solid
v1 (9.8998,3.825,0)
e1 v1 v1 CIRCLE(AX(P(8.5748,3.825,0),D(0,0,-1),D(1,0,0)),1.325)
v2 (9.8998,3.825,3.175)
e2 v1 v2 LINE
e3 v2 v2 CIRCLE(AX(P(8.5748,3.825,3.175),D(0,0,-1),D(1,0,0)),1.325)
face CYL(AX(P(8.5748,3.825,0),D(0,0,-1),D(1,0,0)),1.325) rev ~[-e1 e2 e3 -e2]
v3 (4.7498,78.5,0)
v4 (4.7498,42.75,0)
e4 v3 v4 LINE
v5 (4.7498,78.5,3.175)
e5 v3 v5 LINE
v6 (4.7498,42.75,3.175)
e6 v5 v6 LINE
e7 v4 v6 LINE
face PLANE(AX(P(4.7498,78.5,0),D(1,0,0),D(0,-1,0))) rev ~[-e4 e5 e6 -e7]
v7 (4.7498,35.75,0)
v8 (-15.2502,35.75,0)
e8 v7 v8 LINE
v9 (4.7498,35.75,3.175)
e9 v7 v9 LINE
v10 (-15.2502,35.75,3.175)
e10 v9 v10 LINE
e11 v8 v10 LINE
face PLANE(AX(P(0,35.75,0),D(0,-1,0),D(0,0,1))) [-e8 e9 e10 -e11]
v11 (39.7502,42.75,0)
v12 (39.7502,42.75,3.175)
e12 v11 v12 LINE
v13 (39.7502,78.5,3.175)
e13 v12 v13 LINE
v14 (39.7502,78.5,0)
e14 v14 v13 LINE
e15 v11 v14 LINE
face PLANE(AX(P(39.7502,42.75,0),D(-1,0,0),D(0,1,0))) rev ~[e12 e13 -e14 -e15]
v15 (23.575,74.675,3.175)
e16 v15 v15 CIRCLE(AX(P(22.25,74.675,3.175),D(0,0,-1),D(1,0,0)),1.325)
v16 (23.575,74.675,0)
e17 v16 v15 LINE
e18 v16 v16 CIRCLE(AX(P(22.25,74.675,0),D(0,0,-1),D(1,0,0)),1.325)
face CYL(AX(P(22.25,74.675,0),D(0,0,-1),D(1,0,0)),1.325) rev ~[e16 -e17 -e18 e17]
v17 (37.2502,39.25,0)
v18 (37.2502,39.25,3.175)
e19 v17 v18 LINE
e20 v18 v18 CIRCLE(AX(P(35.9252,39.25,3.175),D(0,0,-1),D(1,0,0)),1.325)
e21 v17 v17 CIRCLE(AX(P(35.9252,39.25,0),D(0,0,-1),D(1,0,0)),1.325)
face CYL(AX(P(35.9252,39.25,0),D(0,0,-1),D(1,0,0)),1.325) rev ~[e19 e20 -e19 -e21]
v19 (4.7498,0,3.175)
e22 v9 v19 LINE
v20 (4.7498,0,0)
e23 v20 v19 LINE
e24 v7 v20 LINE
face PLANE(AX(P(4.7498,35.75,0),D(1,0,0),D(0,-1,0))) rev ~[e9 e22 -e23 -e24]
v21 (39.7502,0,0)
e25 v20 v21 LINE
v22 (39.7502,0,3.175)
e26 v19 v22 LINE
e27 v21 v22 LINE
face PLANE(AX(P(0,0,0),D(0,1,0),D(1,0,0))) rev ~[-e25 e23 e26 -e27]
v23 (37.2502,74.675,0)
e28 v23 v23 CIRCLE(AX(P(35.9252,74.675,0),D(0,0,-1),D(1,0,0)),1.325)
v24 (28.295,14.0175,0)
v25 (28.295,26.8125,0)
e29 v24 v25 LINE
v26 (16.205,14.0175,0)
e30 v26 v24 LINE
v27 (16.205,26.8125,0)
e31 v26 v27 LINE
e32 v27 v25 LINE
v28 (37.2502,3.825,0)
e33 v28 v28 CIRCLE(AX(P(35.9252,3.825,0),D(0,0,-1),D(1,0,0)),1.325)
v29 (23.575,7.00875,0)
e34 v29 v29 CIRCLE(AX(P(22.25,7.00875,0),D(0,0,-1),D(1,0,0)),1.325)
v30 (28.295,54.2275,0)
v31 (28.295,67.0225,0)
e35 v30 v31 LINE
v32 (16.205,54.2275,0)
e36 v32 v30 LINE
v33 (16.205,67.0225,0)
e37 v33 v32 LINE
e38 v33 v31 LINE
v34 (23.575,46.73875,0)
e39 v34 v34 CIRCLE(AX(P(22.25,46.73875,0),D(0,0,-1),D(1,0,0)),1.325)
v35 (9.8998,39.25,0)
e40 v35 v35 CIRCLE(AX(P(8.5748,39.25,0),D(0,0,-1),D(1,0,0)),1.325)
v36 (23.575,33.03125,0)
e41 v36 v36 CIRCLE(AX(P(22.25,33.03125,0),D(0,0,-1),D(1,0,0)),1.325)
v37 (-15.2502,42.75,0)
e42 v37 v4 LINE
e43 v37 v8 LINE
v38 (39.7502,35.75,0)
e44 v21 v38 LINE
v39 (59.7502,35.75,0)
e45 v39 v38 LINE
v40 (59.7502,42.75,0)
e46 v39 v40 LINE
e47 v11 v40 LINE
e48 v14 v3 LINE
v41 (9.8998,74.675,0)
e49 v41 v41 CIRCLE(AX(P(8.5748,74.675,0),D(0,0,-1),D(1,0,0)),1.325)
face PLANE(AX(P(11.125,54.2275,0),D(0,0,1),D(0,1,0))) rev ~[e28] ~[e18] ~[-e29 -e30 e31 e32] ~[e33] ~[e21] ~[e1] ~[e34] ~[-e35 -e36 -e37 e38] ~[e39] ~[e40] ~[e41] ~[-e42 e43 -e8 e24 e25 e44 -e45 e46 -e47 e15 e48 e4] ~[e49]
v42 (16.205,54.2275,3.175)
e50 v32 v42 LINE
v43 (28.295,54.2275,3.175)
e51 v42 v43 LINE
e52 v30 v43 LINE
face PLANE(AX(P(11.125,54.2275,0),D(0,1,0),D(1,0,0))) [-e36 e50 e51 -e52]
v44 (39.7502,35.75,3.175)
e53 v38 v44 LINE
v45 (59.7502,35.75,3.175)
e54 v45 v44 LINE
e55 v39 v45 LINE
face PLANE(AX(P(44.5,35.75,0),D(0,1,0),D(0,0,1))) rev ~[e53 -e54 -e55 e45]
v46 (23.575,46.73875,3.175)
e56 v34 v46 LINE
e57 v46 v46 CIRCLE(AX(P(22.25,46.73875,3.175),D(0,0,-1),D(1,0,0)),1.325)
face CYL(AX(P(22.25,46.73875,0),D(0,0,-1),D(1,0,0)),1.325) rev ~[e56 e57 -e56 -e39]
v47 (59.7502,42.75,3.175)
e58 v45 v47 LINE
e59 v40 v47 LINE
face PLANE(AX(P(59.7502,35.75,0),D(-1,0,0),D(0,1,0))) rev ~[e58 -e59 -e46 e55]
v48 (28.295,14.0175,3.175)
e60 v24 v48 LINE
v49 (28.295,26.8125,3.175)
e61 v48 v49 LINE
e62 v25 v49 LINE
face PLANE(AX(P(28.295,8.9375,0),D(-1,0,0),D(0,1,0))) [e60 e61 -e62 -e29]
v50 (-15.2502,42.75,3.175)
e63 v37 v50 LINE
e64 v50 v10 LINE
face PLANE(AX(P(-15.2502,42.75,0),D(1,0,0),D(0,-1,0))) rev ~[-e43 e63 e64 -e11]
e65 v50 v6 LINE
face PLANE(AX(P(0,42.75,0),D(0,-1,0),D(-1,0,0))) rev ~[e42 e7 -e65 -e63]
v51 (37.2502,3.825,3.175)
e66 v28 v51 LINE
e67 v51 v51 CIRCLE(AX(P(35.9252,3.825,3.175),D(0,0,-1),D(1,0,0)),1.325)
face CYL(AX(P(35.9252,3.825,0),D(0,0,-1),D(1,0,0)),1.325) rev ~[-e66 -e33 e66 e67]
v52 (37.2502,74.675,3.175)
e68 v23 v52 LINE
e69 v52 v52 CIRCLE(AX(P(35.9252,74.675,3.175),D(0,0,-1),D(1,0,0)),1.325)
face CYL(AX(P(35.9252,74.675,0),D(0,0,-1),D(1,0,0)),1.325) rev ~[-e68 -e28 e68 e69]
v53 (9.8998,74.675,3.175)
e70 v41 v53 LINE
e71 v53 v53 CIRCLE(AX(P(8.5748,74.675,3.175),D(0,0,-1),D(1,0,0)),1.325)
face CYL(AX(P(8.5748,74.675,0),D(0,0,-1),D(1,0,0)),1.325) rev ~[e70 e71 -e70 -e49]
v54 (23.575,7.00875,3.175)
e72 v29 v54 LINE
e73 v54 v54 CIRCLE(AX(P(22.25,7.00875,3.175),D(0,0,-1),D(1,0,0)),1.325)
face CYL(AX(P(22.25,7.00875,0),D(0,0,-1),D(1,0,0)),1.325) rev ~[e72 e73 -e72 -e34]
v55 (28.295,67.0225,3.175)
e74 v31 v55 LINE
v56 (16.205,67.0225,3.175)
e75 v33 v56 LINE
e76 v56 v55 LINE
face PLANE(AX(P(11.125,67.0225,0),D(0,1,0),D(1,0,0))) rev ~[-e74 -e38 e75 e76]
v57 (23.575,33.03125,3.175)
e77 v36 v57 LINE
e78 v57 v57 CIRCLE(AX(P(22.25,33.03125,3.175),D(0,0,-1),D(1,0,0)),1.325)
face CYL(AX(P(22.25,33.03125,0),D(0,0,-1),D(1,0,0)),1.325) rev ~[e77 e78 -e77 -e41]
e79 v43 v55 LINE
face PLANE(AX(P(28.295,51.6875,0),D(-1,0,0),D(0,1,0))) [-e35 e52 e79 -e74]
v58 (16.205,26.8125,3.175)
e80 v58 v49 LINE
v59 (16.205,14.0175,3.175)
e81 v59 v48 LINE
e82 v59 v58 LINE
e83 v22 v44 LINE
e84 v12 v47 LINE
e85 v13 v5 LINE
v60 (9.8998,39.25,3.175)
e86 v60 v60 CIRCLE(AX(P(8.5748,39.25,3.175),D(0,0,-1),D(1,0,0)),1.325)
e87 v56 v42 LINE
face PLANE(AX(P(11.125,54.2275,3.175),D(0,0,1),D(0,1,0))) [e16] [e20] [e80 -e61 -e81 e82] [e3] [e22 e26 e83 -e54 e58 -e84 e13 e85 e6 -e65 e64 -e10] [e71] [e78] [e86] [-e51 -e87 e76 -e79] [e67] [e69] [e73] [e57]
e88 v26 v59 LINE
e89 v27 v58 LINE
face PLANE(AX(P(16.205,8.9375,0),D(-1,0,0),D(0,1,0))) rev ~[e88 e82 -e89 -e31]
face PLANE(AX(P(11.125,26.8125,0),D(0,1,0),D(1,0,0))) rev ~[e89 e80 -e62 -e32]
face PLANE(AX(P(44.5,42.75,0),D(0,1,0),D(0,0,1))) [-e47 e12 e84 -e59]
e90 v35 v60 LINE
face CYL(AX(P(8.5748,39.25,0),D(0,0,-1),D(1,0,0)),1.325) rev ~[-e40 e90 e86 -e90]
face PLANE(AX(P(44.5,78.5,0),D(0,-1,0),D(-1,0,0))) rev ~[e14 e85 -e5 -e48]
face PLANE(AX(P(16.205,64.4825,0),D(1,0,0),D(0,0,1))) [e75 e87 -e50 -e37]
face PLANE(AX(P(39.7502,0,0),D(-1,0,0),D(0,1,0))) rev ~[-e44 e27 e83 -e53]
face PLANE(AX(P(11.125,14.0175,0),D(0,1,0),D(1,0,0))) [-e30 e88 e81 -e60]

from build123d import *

# Parameters (mm, degrees)
F0_W      = 22.25
F0_H      = 17.875
F1_DEPTH  = 3.175
F2_DEPTH  = 5.08
F3_DEPTH  = 2.54
F4_DEPTH  = 5.08
F5_DEPTH  = 5.08
F6_DEPTH  = 5.08
F7_DEPTH  = 4.7498
F8_DEPTH  = 4.7498
F9_DEPTH  = 4.7498
F10_DEPTH = 4.7498
F11_DEPTH = 2.54
F12_R     = 1.325
F13_DEPTH = 25.4
F14_DEPTH = 25.4
F15_DEPTH = 25.4
F16_DEPTH = 25.4


# Not quite as in the source:
# - a feature names something its author has since deleted; it is built from what else it names


with BuildPart() as f1:
    # F0 (on Top) → F1 (new body)
    with BuildSketch(Plane.XY):
        Polygon((0, 35.75), (0, 0), (44.5, 0), (44.5, 35.75), (64.5, 35.75), (64.5, 39.25), (64.5, 42.75), (44.5, 42.75), (44.5, 78.5), (0, 78.5), (0, 42.75), (-20, 42.75), (-20, 39.25), (-20, 35.75), align=None)
        with Locations((22.25, 17.875)):
            Rectangle(F0_W, F0_H, mode=Mode.SUBTRACT)
        with Locations((22.25, 60.625)):
            Rectangle(F0_W, F0_H, mode=Mode.SUBTRACT)
    extrude(amount=F1_DEPTH)

    # F2 (add): a face of the model
    f2_faces = [f1.faces().sort_by_distance(p)[0] for p in [
        (22.25, 69.5625, 1.5875),
    ]]
    extrude(f2_faces, amount=F2_DEPTH)

    # F3 (add): faces of the model
    f3_faces = [f1.faces().sort_by_distance(p)[0] for p in [
        (22.25, 51.6875, 1.5875),
        (22.25, 26.8125, 1.5875),
    ]]
    extrude(f3_faces, amount=F3_DEPTH, dir=(0, 1, 0))

    # F4 (add): a face of the model
    f4_faces = [f1.faces().sort_by_distance(p)[0] for p in [
        (22.25, 8.9375, 1.5875),
    ]]
    extrude(f4_faces, amount=F4_DEPTH)

    # F5 (add): faces of the model
    f5_faces = [f1.faces().sort_by_distance(p)[0] for p in [
        (33.375, 59.355, 1.5875),
        (33.375, 20.415, 1.5875),
    ]]
    extrude(f5_faces, amount=F5_DEPTH)

    # F6 (add): faces of the model
    f6_faces = [f1.faces().sort_by_distance(p)[0] for p in [
        (11.125, 59.355, 1.5875),
        (11.125, 20.415, 1.5875),
    ]]
    extrude(f6_faces, amount=F6_DEPTH)

    # F7 (cut): faces of the model
    f7_faces = [f1.faces().sort_by_distance(p)[0] for p in [
        (44.5, 60.625, 1.5875),
        (44.5, 17.875, 1.5875),
    ]]
    extrude(f7_faces, amount=-F7_DEPTH, mode=Mode.SUBTRACT)

    # F8 (cut): faces of the model
    f8_faces = [f1.faces().sort_by_distance(p)[0] for p in [
        (0, 60.625, 1.5875),
        (0, 17.875, 1.5875),
    ]]
    extrude(f8_faces, amount=-F8_DEPTH, mode=Mode.SUBTRACT)

    # F9 (cut): a face of the model
    f9_faces = [f1.faces().sort_by_distance(p)[0] for p in [
        (-20, 39.25, 1.5875),
    ]]
    extrude(f9_faces, amount=-F9_DEPTH, mode=Mode.SUBTRACT)

    # F10 (cut): a face of the model
    f10_faces = [f1.faces().sort_by_distance(p)[0] for p in [
        (64.5, 39.25, 1.5875),
    ]]
    extrude(f10_faces, amount=-F10_DEPTH, mode=Mode.SUBTRACT)

    # F11 (cut): a face of the model
    f11_faces = [f1.faces().sort_by_distance(p)[0] for p in [
        (22.25, 64.4825, 1.5875),
    ]]
    extrude(f11_faces, amount=-F11_DEPTH, mode=Mode.SUBTRACT)

    # F12 (on face) → F13 (cut)
    with BuildSketch(Plane(origin=(0, 0, 0), x_dir=(1, 0, 0), z_dir=(0, 0, -1))):
        with BuildLine():
            ThreePointArc((34.6002, -74.675), (35.9252, -76), (37.2502, -74.675))
            ThreePointArc((37.2502, -74.675), (35.9252, -73.35), (34.6002, -74.675))
        make_face()
        with Locations((8.5748, -74.675)):
            Circle(F12_R)
        with Locations((8.5748, -39.25)):
            Circle(F12_R)
        with BuildLine():
            ThreePointArc((34.6002, -39.25), (35.9252, -40.575), (37.2502, -39.25))
            ThreePointArc((37.2502, -39.25), (35.9252, -37.925), (34.6002, -39.25))
        make_face()
        with Locations((35.9252, -3.825)):
            Circle(F12_R)
        with Locations((8.5748, -3.825)):
            Circle(F12_R)
    extrude(amount=-F13_DEPTH, mode=Mode.SUBTRACT)

    # F12 (on face) → F14 (cut)
    with BuildSketch(Plane(origin=(0, 0, 0), x_dir=(1, 0, 0), z_dir=(0, 0, -1))):
        with Locations((22.25, -74.675)):
            Circle(F12_R)
    extrude(amount=-F14_DEPTH, mode=Mode.SUBTRACT)

    # F12 (on face) → F15 (cut)
    with BuildSketch(Plane(origin=(0, 0, 0), x_dir=(1, 0, 0), z_dir=(0, 0, -1))):
        with Locations((22.25, -7.00875)):
            Circle(F12_R)
        with Locations((22.25, -46.73875)):
            Circle(F12_R)
    extrude(amount=-F15_DEPTH, mode=Mode.SUBTRACT)

    # F12 (on face) → F16 (cut)
    with BuildSketch(Plane(origin=(0, 0, 0), x_dir=(1, 0, 0), z_dir=(0, 0, -1))):
        with Locations((22.25, -33.03125)):
            Circle(F12_R)
    extrude(amount=-F16_DEPTH, mode=Mode.SUBTRACT)


solid = f1.part
